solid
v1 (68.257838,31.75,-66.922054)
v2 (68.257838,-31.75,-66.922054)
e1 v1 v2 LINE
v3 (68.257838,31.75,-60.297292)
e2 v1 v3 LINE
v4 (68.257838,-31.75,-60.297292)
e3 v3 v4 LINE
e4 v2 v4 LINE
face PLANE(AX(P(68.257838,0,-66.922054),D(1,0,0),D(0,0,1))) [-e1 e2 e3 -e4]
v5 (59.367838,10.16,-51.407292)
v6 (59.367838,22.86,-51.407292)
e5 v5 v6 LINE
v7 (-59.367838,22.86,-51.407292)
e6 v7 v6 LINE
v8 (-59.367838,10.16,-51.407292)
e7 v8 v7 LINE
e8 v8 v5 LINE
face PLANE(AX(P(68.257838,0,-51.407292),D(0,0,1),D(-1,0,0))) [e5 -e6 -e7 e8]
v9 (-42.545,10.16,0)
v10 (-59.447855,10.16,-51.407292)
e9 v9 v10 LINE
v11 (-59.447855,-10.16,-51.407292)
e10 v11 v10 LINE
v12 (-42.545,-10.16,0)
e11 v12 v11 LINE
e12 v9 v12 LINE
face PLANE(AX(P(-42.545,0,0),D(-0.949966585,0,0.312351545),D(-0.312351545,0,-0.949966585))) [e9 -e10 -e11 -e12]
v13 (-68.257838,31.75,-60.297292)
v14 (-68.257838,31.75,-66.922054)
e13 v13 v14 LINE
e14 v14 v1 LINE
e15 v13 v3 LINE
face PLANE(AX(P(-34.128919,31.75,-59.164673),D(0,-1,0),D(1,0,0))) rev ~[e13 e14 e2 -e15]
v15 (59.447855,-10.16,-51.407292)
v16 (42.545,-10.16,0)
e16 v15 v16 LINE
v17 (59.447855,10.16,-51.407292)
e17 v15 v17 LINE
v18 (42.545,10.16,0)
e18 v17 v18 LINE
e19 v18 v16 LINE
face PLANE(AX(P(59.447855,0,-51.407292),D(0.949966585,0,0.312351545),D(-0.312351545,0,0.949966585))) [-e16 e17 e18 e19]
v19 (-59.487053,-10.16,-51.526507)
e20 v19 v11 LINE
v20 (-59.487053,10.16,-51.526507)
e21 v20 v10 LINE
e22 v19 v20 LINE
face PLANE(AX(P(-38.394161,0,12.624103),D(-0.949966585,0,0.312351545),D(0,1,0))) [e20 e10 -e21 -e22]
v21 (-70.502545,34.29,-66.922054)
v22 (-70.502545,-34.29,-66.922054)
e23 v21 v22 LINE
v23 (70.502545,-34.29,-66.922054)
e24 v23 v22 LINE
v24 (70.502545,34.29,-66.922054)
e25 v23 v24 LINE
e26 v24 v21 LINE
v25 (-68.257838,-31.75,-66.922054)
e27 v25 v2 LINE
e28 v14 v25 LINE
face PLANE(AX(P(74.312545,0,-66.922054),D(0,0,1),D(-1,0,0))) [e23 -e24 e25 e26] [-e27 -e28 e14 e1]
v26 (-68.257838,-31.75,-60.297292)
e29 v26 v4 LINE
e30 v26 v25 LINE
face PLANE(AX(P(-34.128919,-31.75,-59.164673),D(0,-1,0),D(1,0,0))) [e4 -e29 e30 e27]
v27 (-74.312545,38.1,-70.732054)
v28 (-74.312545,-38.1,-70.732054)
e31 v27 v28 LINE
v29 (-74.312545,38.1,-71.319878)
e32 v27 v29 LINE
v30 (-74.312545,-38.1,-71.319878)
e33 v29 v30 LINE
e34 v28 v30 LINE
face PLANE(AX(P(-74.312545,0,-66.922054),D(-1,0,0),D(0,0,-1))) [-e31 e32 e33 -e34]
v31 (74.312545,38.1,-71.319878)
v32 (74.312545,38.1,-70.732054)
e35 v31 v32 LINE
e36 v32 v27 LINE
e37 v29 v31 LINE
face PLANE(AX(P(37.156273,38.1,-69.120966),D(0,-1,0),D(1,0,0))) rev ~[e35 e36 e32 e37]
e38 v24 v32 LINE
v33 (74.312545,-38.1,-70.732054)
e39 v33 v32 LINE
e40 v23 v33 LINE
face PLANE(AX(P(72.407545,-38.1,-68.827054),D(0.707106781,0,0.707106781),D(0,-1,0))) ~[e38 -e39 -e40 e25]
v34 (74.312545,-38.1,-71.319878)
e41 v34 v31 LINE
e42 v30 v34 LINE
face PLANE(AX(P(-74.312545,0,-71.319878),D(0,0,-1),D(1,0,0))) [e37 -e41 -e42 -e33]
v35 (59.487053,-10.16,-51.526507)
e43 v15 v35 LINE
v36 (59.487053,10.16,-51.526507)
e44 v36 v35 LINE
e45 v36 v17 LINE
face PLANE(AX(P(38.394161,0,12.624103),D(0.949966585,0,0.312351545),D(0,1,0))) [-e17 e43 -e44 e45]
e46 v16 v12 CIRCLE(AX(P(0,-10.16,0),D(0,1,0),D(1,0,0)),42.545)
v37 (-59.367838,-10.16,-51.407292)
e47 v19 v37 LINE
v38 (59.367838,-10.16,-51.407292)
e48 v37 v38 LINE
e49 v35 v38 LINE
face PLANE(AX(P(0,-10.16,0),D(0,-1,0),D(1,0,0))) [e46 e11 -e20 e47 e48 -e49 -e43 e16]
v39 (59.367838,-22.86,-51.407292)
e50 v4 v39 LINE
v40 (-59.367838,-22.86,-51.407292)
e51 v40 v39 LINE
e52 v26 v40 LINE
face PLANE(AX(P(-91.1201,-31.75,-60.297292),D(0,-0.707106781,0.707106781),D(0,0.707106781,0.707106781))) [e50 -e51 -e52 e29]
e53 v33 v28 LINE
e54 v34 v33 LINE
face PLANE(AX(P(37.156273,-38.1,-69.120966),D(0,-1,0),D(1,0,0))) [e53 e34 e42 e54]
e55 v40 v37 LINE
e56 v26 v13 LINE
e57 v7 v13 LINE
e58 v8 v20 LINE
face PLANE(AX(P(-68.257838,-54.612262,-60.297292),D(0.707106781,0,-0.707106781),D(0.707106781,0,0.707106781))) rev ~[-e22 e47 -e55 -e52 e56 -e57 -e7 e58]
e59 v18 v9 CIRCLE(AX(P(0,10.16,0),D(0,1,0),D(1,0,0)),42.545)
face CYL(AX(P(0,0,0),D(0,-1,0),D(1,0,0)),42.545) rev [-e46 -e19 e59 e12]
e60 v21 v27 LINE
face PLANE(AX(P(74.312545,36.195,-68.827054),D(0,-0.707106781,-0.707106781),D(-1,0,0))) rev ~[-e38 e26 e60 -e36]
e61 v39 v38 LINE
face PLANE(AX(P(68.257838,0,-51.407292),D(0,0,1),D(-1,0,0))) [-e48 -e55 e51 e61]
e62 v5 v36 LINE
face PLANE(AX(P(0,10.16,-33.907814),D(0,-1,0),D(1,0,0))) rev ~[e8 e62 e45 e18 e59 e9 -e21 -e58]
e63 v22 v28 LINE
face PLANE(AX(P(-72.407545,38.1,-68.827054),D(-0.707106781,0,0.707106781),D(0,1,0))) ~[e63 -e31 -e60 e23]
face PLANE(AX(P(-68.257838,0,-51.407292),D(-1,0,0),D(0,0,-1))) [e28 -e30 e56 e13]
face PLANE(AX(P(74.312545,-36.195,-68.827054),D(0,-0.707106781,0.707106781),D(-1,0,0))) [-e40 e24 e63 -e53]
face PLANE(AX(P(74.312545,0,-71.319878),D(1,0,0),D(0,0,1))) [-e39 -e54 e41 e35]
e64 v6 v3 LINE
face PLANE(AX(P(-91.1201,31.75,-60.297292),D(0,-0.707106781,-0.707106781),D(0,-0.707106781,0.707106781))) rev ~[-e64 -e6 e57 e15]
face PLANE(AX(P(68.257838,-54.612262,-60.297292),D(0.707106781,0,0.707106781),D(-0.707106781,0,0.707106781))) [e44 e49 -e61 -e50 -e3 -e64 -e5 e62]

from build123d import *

# Parameters (mm, degrees)
F1_DEPTH     = 10.16
F2_DEPTH     = 31.75
F3_DEPTH     = 38.1
F4_T1_DEPTH  = 182.2402005013
F4_T6_DEPTH  = 109.224523526
F4_T12_DEPTH = 109.224523526
F4_T18_DEPTH = 109.224523526
F4_T25_DEPTH = 109.224523526
F4_T31_DEPTH = 109.224523526
F4_T37_DEPTH = 109.224523526
F4_T43_DEPTH = 109.224523526
F4_T49_DEPTH = 109.224523526
F4_T56_DEPTH = 109.224523526
F4_T62_DEPTH = 109.224523526
F5_SIZE      = 3.81


# Not quite as in the source:
# - a fillet or chamfer that OpenCascade refuses, or shapes differently, is made with other operations: its cross-section is extruded or revolved along the edge and cut away or added


with BuildPart() as f1:
    # F0 (on Front) → F1 (new body, symmetric)
    with BuildSketch(Plane.XZ):
        with BuildLine():
            Line((59.4478547573, -51.4072924852), (42.545, 0))
            ThreePointArc((42.545, 0), (0, -42.545), (-42.545, 0))
            Line((-42.545, 0), (-59.4478547573, -51.4072924852))
            Line((-59.4478547573, -51.4072924852), (0, -51.4072924852))
            Line((0, -51.4072924852), (59.4478547573, -51.4072924852))
        make_face()
    extrude(amount=F1_DEPTH, both=True)

    # F0 (on Front) → F2 (join, symmetric)
    with BuildSketch(Plane.XZ):
        Polygon((0, -51.4072924852), (-59.4478547573, -51.4072924852), (-68.2578384876, -51.4072924852), (-68.2578384876, -66.9220536947), (0, -66.9220536947), align=None)
        Polygon((68.2578384876, -51.4072924852), (59.4478547573, -51.4072924852), (0, -51.4072924852), (0, -66.9220536947), (68.2578384876, -66.9220536947), align=None)
    extrude(amount=F2_DEPTH, both=True)

    # F0 (on Front) → F3 (join, symmetric)
    with BuildSketch(Plane.XZ):
        Polygon((74.3125453591, -66.9220536947), (68.2578384876, -66.9220536947), (0, -66.9220536947), (0, -71.3198781013), (74.3125453591, -71.3198781013), align=None)
        Polygon((0, -71.3198781013), (0, -66.9220536947), (-68.2578384876, -66.9220536947), (-74.3125453591, -66.9220536947), (-74.3125453591, -71.3198781013), align=None)
    extrude(amount=F3_DEPTH, both=True)

    # F4: chamfer of 8.89 on 4 edges, made by hand

    # F4_s2 → F4_t1 (cut)
    with BuildSketch(Plane.YZ.offset(-91.1201002506)):
        Polygon((-31.75, -60.2972924852), (-22.86, -51.4072924852), (-31.75, -51.4072924852), align=None)
        Polygon((31.75, -60.2972924852), (22.86, -51.4072924852), (31.75, -51.4072924852), align=None)
    extrude(amount=F4_T1_DEPTH, mode=Mode.SUBTRACT)


with BuildPart() as f4_tool4:
    # F4_s5 → F4_t6 (new body)
    with BuildSketch(Plane.XZ.offset(54.612261763)):
        Polygon((68.2578384876, -60.2972924852), (59.3678384876, -51.4072924852), (68.2578384876, -51.4072924852), align=None)
    extrude(amount=-F4_T6_DEPTH)

    split(bisect_by=Plane(origin=(38.3941614285, 0, 12.624102589), x_dir=(0, 1, 0), z_dir=(0.949966585, 0, 0.3123515446)), keep=Keep.TOP)

    split(bisect_by=Plane.XZ.offset(10.16), keep=Keep.TOP)


with BuildPart() as f1_1:
    add(f1.part)

    # F4_t3: cut F4_tool4
    add(f4_tool4.part, mode=Mode.SUBTRACT)


with BuildPart() as f4_tool10:
    # F4_s11 → F4_t12 (new body)
    with BuildSketch(Plane.XZ.offset(54.612261763)):
        Polygon((68.2578384876, -60.2972924852), (59.3678384876, -51.4072924852), (68.2578384876, -51.4072924852), align=None)
    extrude(amount=-F4_T12_DEPTH)

    split(bisect_by=Plane(origin=(38.3941614285, 0, 12.624102589), x_dir=(0, 1, 0), z_dir=(-0.949966585, 0, -0.3123515446)), keep=Keep.TOP)

    split(bisect_by=Plane.XZ.offset(10.16), keep=Keep.TOP)


with BuildPart() as f1_2:
    add(f1_1.part)

    # F4_t9: cut F4_tool10
    add(f4_tool10.part, mode=Mode.SUBTRACT)


with BuildPart() as f4_tool16:
    # F4_s17 → F4_t18 (new body)
    with BuildSketch(Plane.XZ.offset(54.612261763)):
        Polygon((68.2578384876, -60.2972924852), (59.3678384876, -51.4072924852), (68.2578384876, -51.4072924852), align=None)
    extrude(amount=-F4_T18_DEPTH)

    split(bisect_by=Plane(origin=(38.3941614285, 0, 12.624102589), x_dir=(0, 1, 0), z_dir=(0.949966585, 0, 0.3123515446)), keep=Keep.TOP)

    split(bisect_by=Plane.XZ.offset(-10.16), keep=Keep.TOP)

    split(bisect_by=Plane.XZ.offset(10.16), keep=Keep.BOTTOM)


with BuildPart() as f1_3:
    add(f1_2.part)

    # F4_t15: cut F4_tool16
    add(f4_tool16.part, mode=Mode.SUBTRACT)


with BuildPart() as f4_tool23:
    # F4_s24 → F4_t25 (new body)
    with BuildSketch(Plane.XZ.offset(54.612261763)):
        Polygon((68.2578384876, -60.2972924852), (59.3678384876, -51.4072924852), (68.2578384876, -51.4072924852), align=None)
    extrude(amount=-F4_T25_DEPTH)

    split(bisect_by=Plane(origin=(38.3941614285, 0, 12.624102589), x_dir=(0, 1, 0), z_dir=(0.949966585, 0, 0.3123515446)), keep=Keep.TOP)

    split(bisect_by=Plane.XZ.offset(-10.16), keep=Keep.BOTTOM)


with BuildPart() as f1_4:
    add(f1_3.part)

    # F4_t22: cut F4_tool23
    add(f4_tool23.part, mode=Mode.SUBTRACT)


with BuildPart() as f4_tool29:
    # F4_s30 → F4_t31 (new body)
    with BuildSketch(Plane.XZ.offset(54.612261763)):
        Polygon((68.2578384876, -60.2972924852), (59.3678384876, -51.4072924852), (68.2578384876, -51.4072924852), align=None)
    extrude(amount=-F4_T31_DEPTH)

    split(bisect_by=Plane(origin=(38.3941614285, 0, 12.624102589), x_dir=(0, 1, 0), z_dir=(-0.949966585, 0, -0.3123515446)), keep=Keep.TOP)

    split(bisect_by=Plane.XZ.offset(-10.16), keep=Keep.BOTTOM)


with BuildPart() as f1_5:
    add(f1_4.part)

    # F4_t28: cut F4_tool29
    add(f4_tool29.part, mode=Mode.SUBTRACT)


with BuildPart() as f4_tool35:
    # F4_s36 → F4_t37 (new body)
    with BuildSketch(Plane.XZ.offset(54.612261763)):
        Polygon((-68.2578384876, -60.2972924852), (-59.3678384876, -51.4072924852), (-68.2578384876, -51.4072924852), align=None)
    extrude(amount=-F4_T37_DEPTH)

    split(bisect_by=Plane(origin=(-38.3941614285, 0, 12.624102589), x_dir=(0, 1, 0), z_dir=(-0.949966585, 0, 0.3123515446)), keep=Keep.TOP)

    split(bisect_by=Plane.XZ.offset(10.16), keep=Keep.TOP)


with BuildPart() as f1_6:
    add(f1_5.part)

    # F4_t34: cut F4_tool35
    add(f4_tool35.part, mode=Mode.SUBTRACT)


with BuildPart() as f4_tool41:
    # F4_s42 → F4_t43 (new body)
    with BuildSketch(Plane.XZ.offset(54.612261763)):
        Polygon((-68.2578384876, -60.2972924852), (-59.3678384876, -51.4072924852), (-68.2578384876, -51.4072924852), align=None)
    extrude(amount=-F4_T43_DEPTH)

    split(bisect_by=Plane(origin=(-38.3941614285, 0, 12.624102589), x_dir=(0, 1, 0), z_dir=(0.949966585, 0, -0.3123515446)), keep=Keep.TOP)

    split(bisect_by=Plane.XZ.offset(10.16), keep=Keep.TOP)


with BuildPart() as f1_7:
    add(f1_6.part)

    # F4_t40: cut F4_tool41
    add(f4_tool41.part, mode=Mode.SUBTRACT)


with BuildPart() as f4_tool47:
    # F4_s48 → F4_t49 (new body)
    with BuildSketch(Plane.XZ.offset(54.612261763)):
        Polygon((-68.2578384876, -60.2972924852), (-59.3678384876, -51.4072924852), (-68.2578384876, -51.4072924852), align=None)
    extrude(amount=-F4_T49_DEPTH)

    split(bisect_by=Plane.XZ.offset(-10.16), keep=Keep.TOP)

    split(bisect_by=Plane(origin=(-38.3941614285, 0, 12.624102589), x_dir=(0, 1, 0), z_dir=(-0.949966585, 0, 0.3123515446)), keep=Keep.TOP)

    split(bisect_by=Plane.XZ.offset(10.16), keep=Keep.BOTTOM)


with BuildPart() as f1_8:
    add(f1_7.part)

    # F4_t46: cut F4_tool47
    add(f4_tool47.part, mode=Mode.SUBTRACT)


with BuildPart() as f4_tool54:
    # F4_s55 → F4_t56 (new body)
    with BuildSketch(Plane.XZ.offset(54.612261763)):
        Polygon((-68.2578384876, -60.2972924852), (-59.3678384876, -51.4072924852), (-68.2578384876, -51.4072924852), align=None)
    extrude(amount=-F4_T56_DEPTH)

    split(bisect_by=Plane.XZ.offset(-10.16), keep=Keep.BOTTOM)

    split(bisect_by=Plane(origin=(-38.3941614285, 0, 12.624102589), x_dir=(0, 1, 0), z_dir=(-0.949966585, 0, 0.3123515446)), keep=Keep.TOP)


with BuildPart() as f1_9:
    add(f1_8.part)

    # F4_t53: cut F4_tool54
    add(f4_tool54.part, mode=Mode.SUBTRACT)


with BuildPart() as f4_tool60:
    # F4_s61 → F4_t62 (new body)
    with BuildSketch(Plane.XZ.offset(54.612261763)):
        Polygon((-68.2578384876, -60.2972924852), (-59.3678384876, -51.4072924852), (-68.2578384876, -51.4072924852), align=None)
    extrude(amount=-F4_T62_DEPTH)

    split(bisect_by=Plane.XZ.offset(-10.16), keep=Keep.BOTTOM)

    split(bisect_by=Plane(origin=(-38.3941614285, 0, 12.624102589), x_dir=(0, 1, 0), z_dir=(0.949966585, 0, -0.3123515446)), keep=Keep.TOP)


with BuildPart() as f1_10:
    add(f1_9.part)

    # F4_t59: cut F4_tool60
    add(f4_tool60.part, mode=Mode.SUBTRACT)

    # F5
    f5_edges = [f1_10.edges().sort_by_distance(p)[0] for p in [
        (0, -38.1, -66.922054),
        (-74.312545, 0, -66.922054),
        (74.312545, 0, -66.922054),
        (0, 38.1, -66.922054),
    ]]
    chamfer(f5_edges, length=F5_SIZE)


solid = f1_10.part
